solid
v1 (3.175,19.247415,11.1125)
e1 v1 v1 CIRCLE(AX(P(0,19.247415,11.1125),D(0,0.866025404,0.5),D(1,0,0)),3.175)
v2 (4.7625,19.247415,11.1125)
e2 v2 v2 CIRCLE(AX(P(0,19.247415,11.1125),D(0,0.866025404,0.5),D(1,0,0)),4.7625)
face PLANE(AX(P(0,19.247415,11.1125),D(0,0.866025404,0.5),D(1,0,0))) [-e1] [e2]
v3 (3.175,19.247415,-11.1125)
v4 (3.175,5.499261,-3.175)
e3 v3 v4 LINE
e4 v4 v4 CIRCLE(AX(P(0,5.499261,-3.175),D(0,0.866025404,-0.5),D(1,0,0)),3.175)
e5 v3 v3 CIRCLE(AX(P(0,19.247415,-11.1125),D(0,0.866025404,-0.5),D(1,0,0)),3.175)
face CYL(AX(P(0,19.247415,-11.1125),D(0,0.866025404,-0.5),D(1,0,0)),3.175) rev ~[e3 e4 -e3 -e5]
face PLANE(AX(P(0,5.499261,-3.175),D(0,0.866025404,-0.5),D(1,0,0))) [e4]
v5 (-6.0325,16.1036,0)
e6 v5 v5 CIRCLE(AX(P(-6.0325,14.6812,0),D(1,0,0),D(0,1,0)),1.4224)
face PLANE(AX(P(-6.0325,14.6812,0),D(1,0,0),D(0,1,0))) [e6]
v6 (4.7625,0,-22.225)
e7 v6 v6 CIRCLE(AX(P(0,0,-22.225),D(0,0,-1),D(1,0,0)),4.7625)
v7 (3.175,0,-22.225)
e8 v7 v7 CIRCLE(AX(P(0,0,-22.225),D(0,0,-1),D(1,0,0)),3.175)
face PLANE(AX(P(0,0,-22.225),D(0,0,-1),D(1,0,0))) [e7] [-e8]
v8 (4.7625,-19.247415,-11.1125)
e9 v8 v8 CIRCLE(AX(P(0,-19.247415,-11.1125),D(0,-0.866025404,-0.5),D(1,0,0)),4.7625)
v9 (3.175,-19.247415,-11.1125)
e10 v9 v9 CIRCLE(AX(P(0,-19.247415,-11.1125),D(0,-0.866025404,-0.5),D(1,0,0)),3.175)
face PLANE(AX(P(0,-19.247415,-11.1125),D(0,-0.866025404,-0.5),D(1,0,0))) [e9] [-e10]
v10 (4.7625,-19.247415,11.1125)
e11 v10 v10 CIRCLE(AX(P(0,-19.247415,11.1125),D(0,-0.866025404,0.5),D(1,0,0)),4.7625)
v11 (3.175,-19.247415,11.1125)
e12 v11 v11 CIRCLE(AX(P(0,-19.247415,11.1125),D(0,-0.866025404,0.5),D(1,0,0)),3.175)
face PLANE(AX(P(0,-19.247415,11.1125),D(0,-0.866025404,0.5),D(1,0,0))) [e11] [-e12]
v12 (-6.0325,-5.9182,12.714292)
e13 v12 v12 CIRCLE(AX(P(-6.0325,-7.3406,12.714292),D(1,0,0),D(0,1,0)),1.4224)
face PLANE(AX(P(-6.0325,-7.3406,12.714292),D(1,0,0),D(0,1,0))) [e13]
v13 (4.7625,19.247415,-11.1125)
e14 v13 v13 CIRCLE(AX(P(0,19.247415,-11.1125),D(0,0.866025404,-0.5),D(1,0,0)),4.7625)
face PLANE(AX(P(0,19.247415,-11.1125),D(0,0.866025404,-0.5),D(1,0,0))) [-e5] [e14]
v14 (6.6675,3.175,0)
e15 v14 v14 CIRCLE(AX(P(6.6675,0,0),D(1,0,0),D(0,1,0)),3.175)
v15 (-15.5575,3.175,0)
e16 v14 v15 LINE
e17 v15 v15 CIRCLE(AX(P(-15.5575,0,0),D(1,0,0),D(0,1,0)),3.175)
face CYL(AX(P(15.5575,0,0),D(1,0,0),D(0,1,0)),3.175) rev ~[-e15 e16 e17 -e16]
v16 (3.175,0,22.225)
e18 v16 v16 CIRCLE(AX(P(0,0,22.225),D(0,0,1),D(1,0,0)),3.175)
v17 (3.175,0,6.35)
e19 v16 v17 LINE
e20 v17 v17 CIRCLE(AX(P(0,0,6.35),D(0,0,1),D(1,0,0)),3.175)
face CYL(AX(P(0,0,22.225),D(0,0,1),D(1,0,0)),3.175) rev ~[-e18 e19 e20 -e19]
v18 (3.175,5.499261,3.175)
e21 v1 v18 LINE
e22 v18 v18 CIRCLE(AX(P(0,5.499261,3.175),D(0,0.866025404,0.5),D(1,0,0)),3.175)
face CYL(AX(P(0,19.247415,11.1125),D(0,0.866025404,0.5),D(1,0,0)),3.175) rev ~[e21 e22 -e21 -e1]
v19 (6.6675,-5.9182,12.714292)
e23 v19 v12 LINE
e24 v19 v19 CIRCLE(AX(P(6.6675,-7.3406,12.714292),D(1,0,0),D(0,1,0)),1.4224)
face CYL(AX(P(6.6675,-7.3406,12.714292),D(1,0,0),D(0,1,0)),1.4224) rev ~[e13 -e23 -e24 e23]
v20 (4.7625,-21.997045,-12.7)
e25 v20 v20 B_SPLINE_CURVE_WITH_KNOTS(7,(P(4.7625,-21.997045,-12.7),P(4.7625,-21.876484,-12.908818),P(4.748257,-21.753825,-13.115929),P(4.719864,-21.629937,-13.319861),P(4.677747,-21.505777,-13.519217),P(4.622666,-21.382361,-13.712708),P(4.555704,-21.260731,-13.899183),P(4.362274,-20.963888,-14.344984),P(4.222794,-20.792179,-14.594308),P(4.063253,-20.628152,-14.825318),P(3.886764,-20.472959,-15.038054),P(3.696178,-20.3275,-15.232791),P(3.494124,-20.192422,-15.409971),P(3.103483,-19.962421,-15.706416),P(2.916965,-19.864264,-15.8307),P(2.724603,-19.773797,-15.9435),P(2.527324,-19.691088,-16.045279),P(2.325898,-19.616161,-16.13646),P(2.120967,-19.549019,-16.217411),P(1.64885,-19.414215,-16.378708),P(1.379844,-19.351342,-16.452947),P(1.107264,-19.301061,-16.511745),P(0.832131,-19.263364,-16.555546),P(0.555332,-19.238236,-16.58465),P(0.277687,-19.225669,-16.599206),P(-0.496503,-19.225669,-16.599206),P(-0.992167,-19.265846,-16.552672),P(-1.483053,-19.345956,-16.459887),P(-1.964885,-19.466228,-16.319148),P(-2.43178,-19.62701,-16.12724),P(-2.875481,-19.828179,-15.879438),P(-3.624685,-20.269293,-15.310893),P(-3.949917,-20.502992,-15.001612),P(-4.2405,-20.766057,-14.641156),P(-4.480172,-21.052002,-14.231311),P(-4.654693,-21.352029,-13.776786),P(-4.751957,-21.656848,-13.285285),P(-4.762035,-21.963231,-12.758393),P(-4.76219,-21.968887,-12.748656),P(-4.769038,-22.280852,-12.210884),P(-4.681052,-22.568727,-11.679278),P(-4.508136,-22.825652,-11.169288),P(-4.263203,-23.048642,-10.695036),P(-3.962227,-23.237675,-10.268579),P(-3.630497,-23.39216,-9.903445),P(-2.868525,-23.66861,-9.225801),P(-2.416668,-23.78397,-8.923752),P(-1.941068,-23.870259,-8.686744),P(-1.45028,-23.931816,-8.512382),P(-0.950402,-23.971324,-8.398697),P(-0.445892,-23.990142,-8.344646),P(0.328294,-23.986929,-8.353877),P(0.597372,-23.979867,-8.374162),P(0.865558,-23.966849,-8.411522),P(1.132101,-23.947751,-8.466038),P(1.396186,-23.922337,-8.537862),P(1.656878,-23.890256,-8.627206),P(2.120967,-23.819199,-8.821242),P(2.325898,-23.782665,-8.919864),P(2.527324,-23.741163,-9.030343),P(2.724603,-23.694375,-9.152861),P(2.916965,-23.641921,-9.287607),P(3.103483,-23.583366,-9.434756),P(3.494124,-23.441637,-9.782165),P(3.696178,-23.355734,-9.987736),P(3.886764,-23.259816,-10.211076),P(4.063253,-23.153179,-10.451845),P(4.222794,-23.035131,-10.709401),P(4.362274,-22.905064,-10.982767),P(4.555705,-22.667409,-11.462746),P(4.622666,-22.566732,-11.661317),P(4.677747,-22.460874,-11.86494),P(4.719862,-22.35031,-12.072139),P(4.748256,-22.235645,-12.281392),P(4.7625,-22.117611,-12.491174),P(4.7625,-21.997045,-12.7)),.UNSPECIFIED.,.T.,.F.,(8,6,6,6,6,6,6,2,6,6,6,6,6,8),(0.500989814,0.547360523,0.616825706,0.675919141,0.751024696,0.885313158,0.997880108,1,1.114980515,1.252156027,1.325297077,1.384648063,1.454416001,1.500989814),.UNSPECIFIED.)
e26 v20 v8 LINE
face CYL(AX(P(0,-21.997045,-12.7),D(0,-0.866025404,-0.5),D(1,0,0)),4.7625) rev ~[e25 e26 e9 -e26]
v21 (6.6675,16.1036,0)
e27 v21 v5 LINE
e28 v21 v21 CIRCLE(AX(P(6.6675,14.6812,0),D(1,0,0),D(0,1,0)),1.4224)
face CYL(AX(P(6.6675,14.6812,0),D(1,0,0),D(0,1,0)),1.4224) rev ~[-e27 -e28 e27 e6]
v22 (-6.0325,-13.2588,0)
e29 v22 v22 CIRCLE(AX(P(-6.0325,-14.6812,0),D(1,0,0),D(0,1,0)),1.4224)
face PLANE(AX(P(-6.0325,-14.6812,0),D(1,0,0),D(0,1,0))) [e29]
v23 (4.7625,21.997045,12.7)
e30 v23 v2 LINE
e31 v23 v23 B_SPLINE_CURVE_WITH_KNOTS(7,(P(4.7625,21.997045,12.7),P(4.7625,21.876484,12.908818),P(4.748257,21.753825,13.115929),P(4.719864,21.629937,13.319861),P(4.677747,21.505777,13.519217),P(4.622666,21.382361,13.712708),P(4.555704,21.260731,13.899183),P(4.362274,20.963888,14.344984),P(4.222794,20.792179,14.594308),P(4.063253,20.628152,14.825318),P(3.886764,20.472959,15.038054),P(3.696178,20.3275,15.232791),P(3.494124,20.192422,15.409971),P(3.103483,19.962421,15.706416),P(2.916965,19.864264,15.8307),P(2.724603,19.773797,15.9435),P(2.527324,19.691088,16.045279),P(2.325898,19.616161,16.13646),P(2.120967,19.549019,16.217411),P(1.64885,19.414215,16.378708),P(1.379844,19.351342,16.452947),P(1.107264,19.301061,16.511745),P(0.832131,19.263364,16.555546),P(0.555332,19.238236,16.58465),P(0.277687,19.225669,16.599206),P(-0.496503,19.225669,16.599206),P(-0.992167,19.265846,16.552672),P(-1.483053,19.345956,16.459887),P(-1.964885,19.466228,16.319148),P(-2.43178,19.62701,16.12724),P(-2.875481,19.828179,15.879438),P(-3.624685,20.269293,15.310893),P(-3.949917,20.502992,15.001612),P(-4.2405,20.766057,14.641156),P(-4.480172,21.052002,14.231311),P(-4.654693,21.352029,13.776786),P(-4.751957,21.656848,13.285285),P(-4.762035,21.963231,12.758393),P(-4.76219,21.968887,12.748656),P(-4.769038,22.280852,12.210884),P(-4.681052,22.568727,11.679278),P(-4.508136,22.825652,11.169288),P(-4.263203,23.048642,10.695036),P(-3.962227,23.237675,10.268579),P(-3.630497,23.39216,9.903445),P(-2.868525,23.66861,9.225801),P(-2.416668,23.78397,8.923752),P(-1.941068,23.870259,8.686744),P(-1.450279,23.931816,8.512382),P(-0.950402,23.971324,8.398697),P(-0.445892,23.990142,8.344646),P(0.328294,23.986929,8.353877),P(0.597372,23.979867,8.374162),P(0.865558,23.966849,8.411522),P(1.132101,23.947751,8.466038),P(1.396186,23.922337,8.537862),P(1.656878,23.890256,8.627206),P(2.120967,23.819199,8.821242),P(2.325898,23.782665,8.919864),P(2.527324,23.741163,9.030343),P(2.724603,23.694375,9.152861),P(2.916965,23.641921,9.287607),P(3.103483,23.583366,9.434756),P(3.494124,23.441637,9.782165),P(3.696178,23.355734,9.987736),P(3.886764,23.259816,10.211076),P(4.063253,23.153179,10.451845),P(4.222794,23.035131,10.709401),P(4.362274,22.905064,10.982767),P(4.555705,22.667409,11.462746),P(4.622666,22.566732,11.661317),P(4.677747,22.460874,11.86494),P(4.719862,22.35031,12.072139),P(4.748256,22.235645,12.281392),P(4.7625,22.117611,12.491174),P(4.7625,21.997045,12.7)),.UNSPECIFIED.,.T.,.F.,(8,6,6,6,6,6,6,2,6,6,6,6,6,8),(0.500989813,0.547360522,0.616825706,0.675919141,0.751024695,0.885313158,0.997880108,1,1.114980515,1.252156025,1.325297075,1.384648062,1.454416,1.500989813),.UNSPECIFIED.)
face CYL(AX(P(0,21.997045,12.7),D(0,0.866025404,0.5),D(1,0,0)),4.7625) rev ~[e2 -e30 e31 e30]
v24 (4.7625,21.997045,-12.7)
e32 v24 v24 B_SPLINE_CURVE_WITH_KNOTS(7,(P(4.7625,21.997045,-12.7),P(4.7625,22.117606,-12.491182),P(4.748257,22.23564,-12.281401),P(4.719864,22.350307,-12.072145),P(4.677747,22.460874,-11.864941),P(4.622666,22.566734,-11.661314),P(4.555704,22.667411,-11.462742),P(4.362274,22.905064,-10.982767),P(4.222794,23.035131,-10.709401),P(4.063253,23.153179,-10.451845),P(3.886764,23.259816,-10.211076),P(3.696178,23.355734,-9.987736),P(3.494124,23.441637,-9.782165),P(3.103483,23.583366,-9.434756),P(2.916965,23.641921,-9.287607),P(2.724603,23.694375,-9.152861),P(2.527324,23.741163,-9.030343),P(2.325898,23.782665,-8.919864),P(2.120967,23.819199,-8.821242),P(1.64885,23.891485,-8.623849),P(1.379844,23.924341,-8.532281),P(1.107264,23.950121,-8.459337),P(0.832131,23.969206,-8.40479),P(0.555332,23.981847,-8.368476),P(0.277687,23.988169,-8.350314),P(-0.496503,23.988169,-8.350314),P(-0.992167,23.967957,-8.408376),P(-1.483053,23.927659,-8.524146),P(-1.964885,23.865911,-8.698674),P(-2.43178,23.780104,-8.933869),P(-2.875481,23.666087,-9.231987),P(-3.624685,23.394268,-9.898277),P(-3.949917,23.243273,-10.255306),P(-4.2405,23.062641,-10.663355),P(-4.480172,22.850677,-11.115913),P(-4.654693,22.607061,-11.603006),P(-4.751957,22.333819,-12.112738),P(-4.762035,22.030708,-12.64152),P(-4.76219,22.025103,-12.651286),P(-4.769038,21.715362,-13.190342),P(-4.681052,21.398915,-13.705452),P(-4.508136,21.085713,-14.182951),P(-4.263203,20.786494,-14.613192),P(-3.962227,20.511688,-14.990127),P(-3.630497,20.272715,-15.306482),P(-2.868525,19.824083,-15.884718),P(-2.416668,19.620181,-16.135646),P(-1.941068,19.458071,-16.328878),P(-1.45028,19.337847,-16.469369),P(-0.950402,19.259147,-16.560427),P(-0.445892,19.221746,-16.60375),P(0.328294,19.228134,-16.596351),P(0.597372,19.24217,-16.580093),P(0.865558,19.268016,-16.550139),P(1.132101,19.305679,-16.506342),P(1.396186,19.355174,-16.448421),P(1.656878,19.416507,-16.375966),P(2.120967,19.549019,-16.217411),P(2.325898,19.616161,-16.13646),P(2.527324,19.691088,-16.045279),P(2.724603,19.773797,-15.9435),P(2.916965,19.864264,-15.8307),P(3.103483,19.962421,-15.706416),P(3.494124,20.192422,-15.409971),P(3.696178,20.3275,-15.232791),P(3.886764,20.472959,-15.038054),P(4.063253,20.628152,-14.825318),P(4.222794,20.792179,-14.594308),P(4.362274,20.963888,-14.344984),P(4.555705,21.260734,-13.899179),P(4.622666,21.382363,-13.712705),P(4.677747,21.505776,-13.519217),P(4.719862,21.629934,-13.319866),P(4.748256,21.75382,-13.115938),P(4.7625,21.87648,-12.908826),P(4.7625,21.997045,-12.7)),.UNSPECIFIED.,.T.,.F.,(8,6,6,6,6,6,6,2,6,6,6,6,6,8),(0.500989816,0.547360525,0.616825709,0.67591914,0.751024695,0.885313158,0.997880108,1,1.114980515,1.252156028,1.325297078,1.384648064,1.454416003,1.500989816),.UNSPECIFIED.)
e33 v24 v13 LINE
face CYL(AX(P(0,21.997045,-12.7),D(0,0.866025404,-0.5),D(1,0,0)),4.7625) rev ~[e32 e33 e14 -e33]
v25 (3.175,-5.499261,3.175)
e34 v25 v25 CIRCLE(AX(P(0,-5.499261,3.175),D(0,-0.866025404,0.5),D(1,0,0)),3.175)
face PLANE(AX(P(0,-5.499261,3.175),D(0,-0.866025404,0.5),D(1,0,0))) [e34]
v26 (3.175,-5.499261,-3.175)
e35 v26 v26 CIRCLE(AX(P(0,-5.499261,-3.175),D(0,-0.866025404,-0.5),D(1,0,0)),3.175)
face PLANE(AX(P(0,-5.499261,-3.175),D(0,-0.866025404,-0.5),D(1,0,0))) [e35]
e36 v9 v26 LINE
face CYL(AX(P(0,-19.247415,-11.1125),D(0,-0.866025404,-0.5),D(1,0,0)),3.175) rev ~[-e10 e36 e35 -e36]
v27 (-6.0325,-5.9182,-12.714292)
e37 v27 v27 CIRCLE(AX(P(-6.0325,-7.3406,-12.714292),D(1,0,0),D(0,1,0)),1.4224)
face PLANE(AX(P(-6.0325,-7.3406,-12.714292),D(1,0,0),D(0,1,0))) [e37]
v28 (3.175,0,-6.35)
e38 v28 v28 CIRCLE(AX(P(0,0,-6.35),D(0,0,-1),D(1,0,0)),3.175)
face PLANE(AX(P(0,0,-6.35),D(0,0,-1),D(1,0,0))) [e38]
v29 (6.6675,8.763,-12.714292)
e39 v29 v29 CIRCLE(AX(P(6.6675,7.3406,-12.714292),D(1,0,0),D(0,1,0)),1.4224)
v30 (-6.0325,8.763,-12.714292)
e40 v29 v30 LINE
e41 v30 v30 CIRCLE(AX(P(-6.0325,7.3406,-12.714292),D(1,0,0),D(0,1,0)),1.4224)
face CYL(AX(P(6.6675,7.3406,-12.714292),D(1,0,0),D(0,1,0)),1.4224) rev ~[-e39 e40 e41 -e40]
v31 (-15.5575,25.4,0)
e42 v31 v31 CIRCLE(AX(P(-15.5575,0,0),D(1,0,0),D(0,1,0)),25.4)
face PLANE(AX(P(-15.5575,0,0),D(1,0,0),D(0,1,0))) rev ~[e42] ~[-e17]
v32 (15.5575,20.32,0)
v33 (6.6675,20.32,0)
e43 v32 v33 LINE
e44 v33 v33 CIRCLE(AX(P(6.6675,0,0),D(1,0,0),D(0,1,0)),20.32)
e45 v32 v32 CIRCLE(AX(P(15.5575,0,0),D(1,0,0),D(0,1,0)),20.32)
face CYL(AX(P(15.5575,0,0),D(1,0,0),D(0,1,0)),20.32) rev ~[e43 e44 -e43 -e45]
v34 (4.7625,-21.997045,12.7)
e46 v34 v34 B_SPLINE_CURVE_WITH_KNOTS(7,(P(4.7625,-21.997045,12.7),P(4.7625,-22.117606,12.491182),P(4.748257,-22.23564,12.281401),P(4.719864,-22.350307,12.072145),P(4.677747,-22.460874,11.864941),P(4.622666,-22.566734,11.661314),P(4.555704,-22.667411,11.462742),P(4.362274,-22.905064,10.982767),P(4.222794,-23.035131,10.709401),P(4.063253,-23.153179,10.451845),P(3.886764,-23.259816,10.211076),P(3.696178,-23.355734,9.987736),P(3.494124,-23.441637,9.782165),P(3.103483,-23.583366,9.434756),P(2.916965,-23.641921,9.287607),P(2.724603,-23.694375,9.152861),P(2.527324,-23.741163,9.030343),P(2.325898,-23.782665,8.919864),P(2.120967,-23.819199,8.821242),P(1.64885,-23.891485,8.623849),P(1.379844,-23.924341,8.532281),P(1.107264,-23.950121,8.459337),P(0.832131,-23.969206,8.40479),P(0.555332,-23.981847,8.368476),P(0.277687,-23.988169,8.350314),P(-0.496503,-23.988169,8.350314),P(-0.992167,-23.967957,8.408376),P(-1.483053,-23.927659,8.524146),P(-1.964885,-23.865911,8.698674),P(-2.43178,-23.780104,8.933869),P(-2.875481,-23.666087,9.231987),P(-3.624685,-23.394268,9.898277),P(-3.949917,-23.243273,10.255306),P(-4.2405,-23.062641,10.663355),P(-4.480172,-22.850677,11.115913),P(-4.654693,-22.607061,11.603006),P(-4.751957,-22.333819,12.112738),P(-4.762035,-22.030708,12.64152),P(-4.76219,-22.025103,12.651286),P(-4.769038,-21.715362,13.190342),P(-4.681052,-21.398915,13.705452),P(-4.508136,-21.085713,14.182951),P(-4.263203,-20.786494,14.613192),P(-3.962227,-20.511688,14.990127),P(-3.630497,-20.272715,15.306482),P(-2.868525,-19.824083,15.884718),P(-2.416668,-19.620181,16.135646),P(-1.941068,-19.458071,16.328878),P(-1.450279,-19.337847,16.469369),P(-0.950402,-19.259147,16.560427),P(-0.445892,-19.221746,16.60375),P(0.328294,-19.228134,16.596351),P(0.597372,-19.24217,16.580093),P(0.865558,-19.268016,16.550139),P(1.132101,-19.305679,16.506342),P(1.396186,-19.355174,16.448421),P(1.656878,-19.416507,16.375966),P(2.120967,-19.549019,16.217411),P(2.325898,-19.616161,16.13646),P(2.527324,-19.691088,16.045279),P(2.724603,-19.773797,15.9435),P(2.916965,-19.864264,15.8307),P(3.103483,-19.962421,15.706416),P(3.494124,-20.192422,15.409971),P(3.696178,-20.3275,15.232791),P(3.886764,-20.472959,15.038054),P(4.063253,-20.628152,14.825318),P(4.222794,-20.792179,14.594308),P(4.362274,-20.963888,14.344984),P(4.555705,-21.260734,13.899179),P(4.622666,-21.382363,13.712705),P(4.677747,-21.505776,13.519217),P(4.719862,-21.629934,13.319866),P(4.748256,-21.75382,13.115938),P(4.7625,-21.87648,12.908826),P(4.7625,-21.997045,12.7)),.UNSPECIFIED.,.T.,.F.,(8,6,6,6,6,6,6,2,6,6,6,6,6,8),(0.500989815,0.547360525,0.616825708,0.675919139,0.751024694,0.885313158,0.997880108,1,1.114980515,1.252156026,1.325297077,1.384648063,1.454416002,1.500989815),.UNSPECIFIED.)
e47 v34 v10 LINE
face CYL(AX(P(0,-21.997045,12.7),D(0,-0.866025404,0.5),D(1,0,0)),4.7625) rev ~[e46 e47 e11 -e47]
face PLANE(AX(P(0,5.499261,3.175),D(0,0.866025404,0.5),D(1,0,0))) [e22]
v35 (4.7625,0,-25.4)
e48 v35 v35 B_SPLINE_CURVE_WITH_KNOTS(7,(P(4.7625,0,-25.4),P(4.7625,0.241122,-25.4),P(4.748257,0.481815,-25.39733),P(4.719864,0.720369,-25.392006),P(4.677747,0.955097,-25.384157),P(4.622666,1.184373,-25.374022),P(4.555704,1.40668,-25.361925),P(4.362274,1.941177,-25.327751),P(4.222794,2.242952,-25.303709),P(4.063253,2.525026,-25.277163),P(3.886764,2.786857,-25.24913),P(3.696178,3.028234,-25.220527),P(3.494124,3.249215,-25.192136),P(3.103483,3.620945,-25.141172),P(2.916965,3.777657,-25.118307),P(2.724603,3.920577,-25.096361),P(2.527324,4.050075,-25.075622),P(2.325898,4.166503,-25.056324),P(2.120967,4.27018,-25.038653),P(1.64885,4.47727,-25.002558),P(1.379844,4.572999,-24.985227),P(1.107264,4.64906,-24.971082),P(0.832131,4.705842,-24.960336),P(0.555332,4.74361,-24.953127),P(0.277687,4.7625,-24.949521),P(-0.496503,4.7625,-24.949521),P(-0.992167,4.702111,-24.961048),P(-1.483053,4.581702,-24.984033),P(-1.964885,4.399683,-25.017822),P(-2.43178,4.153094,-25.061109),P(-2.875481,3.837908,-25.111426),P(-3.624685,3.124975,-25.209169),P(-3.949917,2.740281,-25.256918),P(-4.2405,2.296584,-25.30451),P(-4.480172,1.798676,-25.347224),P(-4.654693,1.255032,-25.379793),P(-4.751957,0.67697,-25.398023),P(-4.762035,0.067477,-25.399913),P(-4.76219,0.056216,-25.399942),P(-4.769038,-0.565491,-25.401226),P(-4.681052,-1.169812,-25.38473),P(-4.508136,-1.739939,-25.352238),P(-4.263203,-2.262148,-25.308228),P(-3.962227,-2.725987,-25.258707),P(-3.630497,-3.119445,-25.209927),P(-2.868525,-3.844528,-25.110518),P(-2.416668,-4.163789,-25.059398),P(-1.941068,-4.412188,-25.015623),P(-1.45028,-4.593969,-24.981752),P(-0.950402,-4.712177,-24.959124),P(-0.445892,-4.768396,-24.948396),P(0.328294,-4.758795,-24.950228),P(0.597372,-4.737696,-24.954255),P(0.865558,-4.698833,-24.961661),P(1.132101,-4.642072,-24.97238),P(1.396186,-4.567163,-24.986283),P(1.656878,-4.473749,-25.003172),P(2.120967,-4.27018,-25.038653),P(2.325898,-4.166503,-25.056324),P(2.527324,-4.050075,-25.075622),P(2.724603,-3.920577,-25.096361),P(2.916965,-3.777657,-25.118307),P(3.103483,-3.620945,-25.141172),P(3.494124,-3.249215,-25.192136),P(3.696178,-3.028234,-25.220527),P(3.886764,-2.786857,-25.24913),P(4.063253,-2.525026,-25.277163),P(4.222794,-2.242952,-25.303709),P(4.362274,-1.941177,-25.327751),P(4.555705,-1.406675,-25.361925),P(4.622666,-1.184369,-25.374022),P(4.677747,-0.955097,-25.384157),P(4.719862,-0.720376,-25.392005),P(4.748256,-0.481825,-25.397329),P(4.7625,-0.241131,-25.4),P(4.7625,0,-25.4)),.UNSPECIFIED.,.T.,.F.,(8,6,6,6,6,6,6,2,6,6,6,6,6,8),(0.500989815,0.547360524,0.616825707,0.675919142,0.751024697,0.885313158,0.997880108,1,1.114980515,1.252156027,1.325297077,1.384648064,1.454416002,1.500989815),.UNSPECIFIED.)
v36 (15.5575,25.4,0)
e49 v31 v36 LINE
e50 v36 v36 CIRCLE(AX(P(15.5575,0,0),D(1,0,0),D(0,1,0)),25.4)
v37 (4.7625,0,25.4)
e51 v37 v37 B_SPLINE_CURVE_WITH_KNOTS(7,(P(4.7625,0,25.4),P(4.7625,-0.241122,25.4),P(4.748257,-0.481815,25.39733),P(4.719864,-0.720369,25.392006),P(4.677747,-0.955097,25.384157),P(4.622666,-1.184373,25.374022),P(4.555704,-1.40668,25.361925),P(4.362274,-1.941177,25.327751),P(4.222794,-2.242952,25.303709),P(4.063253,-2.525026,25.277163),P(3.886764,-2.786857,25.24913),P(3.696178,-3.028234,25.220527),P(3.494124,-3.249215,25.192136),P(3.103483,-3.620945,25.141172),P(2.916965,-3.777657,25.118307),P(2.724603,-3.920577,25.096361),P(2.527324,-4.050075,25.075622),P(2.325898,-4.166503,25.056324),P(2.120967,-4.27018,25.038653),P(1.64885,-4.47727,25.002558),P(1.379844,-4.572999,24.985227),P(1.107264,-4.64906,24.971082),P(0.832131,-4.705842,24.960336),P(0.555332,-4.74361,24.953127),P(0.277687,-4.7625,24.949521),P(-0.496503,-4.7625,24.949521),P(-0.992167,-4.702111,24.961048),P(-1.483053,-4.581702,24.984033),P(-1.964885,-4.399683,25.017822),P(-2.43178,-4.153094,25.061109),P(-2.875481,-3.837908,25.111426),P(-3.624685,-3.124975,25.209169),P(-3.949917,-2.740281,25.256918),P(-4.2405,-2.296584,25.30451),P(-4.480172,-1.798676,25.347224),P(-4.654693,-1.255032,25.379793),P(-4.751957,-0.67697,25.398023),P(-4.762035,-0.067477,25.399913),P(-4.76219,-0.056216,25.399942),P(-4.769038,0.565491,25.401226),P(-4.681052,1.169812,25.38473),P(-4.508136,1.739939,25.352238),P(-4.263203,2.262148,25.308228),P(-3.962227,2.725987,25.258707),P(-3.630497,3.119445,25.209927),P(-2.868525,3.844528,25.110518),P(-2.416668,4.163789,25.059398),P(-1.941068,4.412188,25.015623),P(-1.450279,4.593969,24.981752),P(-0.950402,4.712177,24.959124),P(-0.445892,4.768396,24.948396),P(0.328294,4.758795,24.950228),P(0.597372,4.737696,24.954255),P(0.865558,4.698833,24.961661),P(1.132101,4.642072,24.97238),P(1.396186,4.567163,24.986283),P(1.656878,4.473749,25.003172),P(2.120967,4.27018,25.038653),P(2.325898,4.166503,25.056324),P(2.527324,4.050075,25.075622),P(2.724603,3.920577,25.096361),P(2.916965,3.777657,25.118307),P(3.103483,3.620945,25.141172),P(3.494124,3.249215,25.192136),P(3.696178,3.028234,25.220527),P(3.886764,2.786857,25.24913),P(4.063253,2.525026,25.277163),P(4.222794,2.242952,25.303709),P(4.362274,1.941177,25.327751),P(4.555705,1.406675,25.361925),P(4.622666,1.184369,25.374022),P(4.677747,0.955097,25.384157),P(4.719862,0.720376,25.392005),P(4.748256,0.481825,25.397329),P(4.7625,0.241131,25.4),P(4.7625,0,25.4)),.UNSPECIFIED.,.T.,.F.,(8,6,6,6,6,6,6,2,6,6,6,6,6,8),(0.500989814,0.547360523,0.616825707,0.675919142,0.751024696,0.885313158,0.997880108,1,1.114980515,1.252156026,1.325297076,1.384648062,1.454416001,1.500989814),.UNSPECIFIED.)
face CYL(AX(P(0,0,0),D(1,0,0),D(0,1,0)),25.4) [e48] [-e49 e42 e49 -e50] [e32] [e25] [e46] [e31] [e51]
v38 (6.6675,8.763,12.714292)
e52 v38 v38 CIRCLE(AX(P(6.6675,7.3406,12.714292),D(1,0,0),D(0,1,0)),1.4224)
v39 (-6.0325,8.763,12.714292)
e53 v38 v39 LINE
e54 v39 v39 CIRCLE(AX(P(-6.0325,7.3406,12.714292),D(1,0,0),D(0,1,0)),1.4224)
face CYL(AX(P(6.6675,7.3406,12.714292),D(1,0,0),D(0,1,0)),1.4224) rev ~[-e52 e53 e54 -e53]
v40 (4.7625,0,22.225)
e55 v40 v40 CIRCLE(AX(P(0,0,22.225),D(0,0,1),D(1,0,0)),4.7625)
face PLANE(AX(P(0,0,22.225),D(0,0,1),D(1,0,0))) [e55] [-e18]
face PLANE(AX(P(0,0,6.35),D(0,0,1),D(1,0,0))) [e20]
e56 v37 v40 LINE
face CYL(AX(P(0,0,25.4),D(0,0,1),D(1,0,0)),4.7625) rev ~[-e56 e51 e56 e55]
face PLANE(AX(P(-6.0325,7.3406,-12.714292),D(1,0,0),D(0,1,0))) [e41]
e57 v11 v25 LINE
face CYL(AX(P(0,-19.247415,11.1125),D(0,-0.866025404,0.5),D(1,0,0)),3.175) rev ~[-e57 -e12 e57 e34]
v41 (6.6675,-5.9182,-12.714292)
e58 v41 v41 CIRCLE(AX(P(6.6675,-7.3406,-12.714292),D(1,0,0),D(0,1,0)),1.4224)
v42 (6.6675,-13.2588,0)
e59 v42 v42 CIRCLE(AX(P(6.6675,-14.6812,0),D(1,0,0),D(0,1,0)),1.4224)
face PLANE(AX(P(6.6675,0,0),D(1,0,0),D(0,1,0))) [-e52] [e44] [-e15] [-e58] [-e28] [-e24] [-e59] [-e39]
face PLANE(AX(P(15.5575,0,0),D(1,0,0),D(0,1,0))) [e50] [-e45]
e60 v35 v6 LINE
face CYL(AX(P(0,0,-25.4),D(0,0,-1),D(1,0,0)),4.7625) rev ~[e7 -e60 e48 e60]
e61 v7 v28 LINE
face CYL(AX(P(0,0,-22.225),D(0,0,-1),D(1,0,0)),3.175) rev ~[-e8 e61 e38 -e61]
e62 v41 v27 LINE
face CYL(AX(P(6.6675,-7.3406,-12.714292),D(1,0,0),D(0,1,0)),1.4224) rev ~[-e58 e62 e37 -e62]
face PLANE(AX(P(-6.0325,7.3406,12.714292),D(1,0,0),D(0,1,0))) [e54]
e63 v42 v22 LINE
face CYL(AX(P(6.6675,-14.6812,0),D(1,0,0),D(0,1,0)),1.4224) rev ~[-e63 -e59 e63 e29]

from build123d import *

# Parameters (mm, degrees)
F0_R             = 25.4
F1_DEPTH         = 15.5575
F2_R             = 3.175
F3_DEPTH         = 31.116
F4_R             = 20.32
F5_DEPTH         = 8.89
F6_R             = 1.4224
F7_DEPTH         = 12.7
F9_R             = 4.7625
F9_R_2           = 3.175
F10_DEPTH        = 3.175
F10_COPIES_COUNT = 6
F11_R            = 3.175
F12_DEPTH        = 15.875
F12_COPIES_COUNT = 6


# Not quite as in the source:
# - a pattern or mirror of a feature is missing from the dataset's text; its kind, count and spacing are read off the source's solid


with BuildPart() as f1:
    # F0 (on Right) → F1 (new body, symmetric)
    with BuildSketch(Plane.YZ):
        Circle(F0_R)
    extrude(amount=F1_DEPTH, both=True)

    # F2 (on face) → F3 (cut, through all)
    with BuildSketch(Plane.YZ.offset(15.5575)):
        Circle(F2_R)
    extrude(amount=-F3_DEPTH, mode=Mode.SUBTRACT)

    # F4 (on face) → F5 (cut)
    with BuildSketch(Plane.YZ.offset(15.5575)):
        Circle(F4_R)
    extrude(amount=-F5_DEPTH, mode=Mode.SUBTRACT)

    # F6 (on face) → F7 (cut)
    with BuildSketch(Plane.YZ.offset(6.6675)):
        with Locations((14.6812, 0)):
            Circle(F6_R)
        with Locations((7.3406, -12.714292158)):
            Circle(F6_R)
        with Locations((-7.3406, -12.714292158)):
            Circle(F6_R)
        with Locations((-14.6812, 0)):
            Circle(F6_R)
        with Locations((-7.3406, 12.714292158)):
            Circle(F6_R)
        with Locations((7.3406, 12.714292158)):
            Circle(F6_R)
    extrude(amount=-F7_DEPTH, mode=Mode.SUBTRACT)

    # F9 (on offset) → F10 (cut)
    with BuildSketch(Plane.XY.offset(25.4)):
        Circle(F9_R)
        Circle(F9_R_2, mode=Mode.SUBTRACT)
        Circle(F9_R_2)
    f10 = extrude(amount=-F10_DEPTH, mode=Mode.SUBTRACT)

    # F10_copies: F10 ×6 about axis
    f10_copies_axis = Axis((0, 0, 0), (1, 0, 0))
    for i in range(1, F10_COPIES_COUNT):
        add(f10.rotate(f10_copies_axis, i * 360 / F10_COPIES_COUNT), mode=Mode.SUBTRACT)

    # F11 (on face) → F12 (cut)
    with BuildSketch(Plane.XY.offset(22.225)):
        Circle(F11_R)
    f12 = extrude(amount=-F12_DEPTH, mode=Mode.SUBTRACT)

    # F12_copies: F12 ×6 about axis
    f12_copies_axis = Axis((0, 0, 0), (1, 0, 0))
    for i in range(1, F12_COPIES_COUNT):
        add(f12.rotate(f12_copies_axis, i * 360 / F12_COPIES_COUNT), mode=Mode.SUBTRACT)


solid = f1.part
